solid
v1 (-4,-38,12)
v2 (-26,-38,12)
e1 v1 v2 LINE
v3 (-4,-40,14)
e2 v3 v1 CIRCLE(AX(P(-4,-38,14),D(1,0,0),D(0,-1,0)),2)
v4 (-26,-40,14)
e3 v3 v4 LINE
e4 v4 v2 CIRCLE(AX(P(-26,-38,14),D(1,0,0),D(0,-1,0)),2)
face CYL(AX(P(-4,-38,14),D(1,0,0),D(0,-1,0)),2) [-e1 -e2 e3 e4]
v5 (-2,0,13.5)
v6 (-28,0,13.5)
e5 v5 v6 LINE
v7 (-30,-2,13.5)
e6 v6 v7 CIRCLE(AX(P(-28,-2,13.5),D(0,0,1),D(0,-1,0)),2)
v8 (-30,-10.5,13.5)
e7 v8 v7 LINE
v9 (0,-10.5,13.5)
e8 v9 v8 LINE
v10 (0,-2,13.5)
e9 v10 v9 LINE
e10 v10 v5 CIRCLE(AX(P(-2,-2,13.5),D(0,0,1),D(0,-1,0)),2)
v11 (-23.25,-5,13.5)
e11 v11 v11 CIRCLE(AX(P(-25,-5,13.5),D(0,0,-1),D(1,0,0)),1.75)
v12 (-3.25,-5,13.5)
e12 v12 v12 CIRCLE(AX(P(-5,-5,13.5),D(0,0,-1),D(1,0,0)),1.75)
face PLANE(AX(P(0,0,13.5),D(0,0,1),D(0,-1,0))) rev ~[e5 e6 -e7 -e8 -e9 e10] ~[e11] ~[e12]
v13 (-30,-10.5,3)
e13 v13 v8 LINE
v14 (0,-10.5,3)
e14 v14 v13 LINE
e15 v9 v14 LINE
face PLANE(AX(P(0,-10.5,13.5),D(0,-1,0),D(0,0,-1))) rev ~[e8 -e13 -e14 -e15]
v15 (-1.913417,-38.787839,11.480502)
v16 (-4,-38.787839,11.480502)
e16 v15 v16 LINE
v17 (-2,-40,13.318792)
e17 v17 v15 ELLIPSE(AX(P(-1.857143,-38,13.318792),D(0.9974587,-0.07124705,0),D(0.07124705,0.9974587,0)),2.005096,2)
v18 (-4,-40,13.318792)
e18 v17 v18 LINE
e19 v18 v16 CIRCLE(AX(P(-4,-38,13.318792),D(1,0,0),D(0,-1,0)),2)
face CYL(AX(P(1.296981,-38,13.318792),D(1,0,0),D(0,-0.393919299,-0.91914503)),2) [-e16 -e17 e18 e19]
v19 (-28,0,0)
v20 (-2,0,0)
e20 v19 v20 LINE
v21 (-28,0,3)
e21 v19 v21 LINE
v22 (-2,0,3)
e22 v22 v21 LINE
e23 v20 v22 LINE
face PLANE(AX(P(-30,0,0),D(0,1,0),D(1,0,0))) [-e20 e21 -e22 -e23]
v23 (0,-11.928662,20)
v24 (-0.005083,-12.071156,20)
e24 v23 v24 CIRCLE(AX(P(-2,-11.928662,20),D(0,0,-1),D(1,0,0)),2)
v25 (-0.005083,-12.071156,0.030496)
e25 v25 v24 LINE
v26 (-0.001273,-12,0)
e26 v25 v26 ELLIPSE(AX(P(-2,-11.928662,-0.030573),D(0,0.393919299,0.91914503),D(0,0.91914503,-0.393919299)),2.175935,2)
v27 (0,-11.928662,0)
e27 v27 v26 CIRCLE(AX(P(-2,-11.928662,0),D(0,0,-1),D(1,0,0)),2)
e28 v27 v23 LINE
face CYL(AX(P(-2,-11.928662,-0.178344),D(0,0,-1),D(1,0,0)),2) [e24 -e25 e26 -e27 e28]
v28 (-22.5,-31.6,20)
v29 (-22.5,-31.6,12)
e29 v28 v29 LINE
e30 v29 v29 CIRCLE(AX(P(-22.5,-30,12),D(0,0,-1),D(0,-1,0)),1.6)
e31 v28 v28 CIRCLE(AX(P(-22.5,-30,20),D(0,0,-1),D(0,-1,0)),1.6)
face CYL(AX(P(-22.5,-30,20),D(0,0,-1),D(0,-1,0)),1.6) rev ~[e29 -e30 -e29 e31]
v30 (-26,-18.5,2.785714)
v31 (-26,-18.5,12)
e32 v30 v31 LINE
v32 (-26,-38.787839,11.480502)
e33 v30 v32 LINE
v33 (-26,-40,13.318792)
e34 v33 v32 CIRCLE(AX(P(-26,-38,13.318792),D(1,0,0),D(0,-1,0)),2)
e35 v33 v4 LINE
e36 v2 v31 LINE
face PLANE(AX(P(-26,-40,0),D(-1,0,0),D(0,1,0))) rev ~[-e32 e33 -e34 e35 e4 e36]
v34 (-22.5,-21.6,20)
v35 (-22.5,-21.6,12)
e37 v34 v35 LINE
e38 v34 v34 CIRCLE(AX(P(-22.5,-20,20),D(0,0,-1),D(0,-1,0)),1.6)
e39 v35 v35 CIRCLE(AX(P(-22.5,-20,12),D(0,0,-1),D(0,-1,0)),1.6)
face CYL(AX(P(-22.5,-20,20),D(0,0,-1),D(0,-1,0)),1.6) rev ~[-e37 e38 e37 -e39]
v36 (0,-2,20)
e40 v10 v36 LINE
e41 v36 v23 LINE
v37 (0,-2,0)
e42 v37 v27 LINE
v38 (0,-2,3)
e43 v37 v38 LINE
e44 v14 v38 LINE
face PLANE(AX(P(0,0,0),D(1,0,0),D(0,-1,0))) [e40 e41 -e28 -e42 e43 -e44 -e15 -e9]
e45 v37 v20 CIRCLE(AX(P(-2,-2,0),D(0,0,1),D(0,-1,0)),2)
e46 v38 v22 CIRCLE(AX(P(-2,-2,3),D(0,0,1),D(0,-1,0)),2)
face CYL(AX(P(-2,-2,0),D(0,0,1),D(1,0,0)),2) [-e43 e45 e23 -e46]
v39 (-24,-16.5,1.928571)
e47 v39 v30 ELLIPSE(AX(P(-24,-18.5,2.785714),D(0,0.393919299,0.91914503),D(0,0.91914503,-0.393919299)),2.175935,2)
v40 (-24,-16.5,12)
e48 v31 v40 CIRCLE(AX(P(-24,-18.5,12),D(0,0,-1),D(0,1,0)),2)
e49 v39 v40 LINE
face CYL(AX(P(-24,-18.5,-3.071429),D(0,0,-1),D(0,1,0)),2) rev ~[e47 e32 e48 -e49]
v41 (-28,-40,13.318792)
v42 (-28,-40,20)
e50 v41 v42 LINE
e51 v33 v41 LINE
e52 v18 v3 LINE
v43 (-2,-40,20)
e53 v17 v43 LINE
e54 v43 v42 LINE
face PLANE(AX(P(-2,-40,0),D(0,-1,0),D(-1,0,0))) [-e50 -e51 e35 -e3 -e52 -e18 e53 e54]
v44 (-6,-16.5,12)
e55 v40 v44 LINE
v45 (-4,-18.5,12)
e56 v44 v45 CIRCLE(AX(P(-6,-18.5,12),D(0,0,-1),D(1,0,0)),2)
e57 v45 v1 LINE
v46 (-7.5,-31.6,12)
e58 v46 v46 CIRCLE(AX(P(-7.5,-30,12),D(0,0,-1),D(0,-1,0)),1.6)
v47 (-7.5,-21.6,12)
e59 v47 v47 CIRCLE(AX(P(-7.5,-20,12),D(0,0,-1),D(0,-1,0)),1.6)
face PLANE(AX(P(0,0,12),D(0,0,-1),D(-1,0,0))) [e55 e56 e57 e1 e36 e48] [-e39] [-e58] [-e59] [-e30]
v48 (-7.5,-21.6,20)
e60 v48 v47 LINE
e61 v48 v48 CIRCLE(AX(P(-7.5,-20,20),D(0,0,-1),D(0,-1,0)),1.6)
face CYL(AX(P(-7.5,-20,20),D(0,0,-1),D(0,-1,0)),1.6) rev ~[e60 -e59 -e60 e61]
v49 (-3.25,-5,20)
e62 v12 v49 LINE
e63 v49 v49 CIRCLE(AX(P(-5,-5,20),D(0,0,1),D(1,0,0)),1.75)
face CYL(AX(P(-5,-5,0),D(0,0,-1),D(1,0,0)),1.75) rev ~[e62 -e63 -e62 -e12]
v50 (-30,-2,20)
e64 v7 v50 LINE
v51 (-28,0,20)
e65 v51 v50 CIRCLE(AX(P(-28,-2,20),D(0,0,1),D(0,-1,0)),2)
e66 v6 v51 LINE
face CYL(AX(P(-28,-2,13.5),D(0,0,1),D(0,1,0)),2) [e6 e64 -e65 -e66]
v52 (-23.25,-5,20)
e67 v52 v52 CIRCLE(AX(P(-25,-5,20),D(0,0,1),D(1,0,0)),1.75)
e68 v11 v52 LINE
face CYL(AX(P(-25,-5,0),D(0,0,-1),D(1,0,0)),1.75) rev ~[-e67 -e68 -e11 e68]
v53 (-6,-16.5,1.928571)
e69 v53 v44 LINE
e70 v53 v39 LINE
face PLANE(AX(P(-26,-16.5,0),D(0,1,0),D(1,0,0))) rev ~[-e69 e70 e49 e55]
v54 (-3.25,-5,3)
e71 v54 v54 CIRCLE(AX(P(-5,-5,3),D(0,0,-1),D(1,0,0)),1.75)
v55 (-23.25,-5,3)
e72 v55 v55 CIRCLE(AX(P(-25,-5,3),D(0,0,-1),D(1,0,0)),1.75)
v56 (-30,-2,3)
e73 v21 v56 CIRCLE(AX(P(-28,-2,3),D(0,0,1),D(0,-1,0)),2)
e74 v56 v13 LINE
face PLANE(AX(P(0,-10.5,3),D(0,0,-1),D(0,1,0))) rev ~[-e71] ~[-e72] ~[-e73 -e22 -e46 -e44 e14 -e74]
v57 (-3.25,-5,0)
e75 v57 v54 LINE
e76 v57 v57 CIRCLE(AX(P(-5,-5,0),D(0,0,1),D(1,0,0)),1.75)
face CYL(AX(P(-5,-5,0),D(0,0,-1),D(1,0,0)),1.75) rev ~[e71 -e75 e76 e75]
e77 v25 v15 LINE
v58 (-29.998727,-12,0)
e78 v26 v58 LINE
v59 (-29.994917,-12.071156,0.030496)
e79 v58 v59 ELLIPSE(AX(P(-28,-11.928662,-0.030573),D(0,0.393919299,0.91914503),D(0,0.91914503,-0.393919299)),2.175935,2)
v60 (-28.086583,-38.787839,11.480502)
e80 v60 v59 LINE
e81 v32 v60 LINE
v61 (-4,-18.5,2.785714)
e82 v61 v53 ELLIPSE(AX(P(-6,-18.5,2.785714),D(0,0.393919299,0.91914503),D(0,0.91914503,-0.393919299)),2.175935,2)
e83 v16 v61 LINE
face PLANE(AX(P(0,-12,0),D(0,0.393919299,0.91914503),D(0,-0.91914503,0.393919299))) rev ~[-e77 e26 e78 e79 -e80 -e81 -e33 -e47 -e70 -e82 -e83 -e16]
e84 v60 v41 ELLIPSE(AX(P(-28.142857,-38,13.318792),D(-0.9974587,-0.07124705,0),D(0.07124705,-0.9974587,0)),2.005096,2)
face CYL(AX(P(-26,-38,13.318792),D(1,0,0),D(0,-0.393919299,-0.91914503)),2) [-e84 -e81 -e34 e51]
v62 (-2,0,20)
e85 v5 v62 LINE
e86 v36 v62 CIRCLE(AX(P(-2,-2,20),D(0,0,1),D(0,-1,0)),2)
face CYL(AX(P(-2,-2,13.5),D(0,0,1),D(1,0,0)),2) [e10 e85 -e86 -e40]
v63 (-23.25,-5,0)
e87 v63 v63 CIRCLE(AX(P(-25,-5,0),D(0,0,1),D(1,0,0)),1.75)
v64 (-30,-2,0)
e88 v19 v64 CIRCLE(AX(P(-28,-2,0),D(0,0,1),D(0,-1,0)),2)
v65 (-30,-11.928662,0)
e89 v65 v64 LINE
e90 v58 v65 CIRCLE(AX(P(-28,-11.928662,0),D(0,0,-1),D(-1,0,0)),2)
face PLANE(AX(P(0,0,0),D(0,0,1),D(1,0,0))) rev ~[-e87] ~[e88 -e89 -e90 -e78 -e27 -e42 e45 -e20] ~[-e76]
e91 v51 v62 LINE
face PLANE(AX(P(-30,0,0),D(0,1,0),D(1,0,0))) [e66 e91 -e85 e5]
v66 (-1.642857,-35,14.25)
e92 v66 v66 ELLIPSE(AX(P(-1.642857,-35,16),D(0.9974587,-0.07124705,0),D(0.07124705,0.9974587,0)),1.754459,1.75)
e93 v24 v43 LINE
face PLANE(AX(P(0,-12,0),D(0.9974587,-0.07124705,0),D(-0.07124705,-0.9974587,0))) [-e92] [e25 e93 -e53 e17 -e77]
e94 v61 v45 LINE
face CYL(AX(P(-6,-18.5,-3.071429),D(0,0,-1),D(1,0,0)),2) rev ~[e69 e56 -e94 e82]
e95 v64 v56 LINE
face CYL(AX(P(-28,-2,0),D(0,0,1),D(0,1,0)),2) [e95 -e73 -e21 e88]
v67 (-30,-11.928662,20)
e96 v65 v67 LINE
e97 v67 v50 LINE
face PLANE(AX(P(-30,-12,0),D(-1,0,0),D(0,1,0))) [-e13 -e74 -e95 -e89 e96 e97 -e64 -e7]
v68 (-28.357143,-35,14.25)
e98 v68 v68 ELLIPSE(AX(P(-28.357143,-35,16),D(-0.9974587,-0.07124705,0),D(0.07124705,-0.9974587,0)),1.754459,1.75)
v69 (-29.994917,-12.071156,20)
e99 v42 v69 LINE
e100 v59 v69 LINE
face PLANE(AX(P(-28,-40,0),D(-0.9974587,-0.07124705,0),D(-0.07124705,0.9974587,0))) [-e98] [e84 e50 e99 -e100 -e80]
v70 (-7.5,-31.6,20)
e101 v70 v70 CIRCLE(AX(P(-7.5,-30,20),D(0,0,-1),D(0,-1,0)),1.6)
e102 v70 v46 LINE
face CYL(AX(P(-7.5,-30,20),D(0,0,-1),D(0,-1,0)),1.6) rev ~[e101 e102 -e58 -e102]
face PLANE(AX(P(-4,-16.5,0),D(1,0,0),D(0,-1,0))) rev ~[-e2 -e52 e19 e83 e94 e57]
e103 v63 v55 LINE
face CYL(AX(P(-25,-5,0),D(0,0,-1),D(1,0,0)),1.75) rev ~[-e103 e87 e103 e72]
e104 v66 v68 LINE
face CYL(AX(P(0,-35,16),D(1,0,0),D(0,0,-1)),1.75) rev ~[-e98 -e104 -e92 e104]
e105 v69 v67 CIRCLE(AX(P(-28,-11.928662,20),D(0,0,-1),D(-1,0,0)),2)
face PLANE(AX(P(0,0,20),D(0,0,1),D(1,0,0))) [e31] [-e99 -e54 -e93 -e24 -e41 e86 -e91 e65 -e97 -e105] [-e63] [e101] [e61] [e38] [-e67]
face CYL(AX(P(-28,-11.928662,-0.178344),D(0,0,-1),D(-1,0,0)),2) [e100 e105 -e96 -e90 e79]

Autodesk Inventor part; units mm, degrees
ref_plane "YZ Plane" through (0, 0, 0) normal (1, 0, 0) x (0, 1, 0)
ref_plane "XZ Plane" through (0, 0, 0) normal (0, 1, 0) x (-1, 0, 0)
ref_plane "XY Plane" through (0, 0, 0) normal (0, 0, 1) x (1, 0, 0)
sketch "スケッチ1" plane through (0, 0, 0) normal (0, 0, 1) x (1, 0, 0)
  line L0 (0, 0) -> (0, -12)
  line L1 (0, -12) -> (-2, -40)
  line L2 (-2, -40) -> (-28, -40)
  line L3 (-28, -40) -> (-30, -12)
  line L4 (-30, -12) -> (-30, 0)
  line L5 (-30, 0) -> (0, 0)
  circle A0 centre (-25, -5) radius 1.75
  circle A1 centre (-5, -5) radius 1.75
  dimension "d0" = 12
  dimension "d1" = 30
  dimension "d2" = 40
  dimension "d3" = 2
  dimension "d4" = 26
  dimension "d12" = 3.5
  dimension "d13" = 3.5
  dimension "d14" = 5
  dimension "d15" = 5
  dimension "d16" = 5
extrude "押し出し1" add sketch "スケッチ1" along normal blind 20
sketch "スケッチ2" plane through (0, -12, 0) normal (1, 0, 0) x (0, 0, -1)
  line L0 (0, 12) -> (-20, 12) projected
  line L1 (-3, 12) -> (-13.5, 12)
  line L2 (-13.5, 12) -> (-13.5, 1.5)
  line L3 (-13.5, 1.5) -> (-3, 1.5)
  line L4 (-3, 1.5) -> (-3, 12)
  line L5 (0, 12) -> (0, 0) projected
  line L6 (0, -28) -> (0, 0) projected
  line L7 (0, 0) -> (-12, -28)
  line L8 (0, -28) -> (-20, -28) projected
  circle A0 centre (-16, -23) radius 1.75
  line L9 (-20, -28) -> (-20, 0) projected
  dimension "d7" = 10.5
  dimension "d8" = 10.5
  dimension "d9" = 3
  dimension "d22" = 12
  dimension "d34" = 3.5
  dimension "d35" = 4
  dimension "d36" = 5
extrude "押し出し2" cut sketch "スケッチ2" against normal through all
sketch "スケッチ3" plane through (0, 0, 0) normal (0, 0, -1) x (-1, 0, 0)
  line L0 (4, -40) -> (26, -40)
  line L1 (26, -40) -> (26, -16.5)
  line L2 (26, -16.5) -> (4, -16.5)
  line L3 (4, -16.5) -> (4, -40)
  line L4 (28, -40) -> (2, -40) projected
  point P0 (0, 0)
  dimension "d17" = 23.5
  dimension "d18" = 2
  dimension "d19" = 2
extrude "押し出し3" cut sketch "スケッチ3" against normal blind 12
sketch "スケッチ4" plane through (0, 0, 20) normal (0, 0, 1) x (1, 0, 0)
  line L0 (-22.5, -30) -> (-7.5, -30)
  line L1 (-7.5, -30) -> (-7.5, -20)
  line L2 (-7.5, -20) -> (-22.5, -20)
  line L3 (-22.5, -20) -> (-22.5, -30)
  line L4 (0, 0) -> (-30, 0) projected
  line L5 (0, -12) -> (0, 0) projected
  dimension "d23" = 15
  dimension "d24" = 20
  dimension "d25" = 7.5
  dimension "d26" = 10
hole "穴1" at (-22.5, -20, 20) at (-22.5, -30, 20) at (-7.5, -30, 20) at (-7.5, -20, 20) direction (0, 0, -1) diameter 3.2 end through all
fillet "フィレット1" radius 2 7 edges at (-26, -16.5, 6.9643) (-4, -16.5, 6.9643) (-15, -40, 12) (-3, -40, 12) (-27, -40, 12) (0, -12, 10) (-30, -12, 10)
fillet "フィレット2" radius 2 4 edges at (0, 0, 16.75) (0, 0, 1.5) (-30, 0, 1.5) (-30, 0, 16.75)
properties part number "ma_3d1"
